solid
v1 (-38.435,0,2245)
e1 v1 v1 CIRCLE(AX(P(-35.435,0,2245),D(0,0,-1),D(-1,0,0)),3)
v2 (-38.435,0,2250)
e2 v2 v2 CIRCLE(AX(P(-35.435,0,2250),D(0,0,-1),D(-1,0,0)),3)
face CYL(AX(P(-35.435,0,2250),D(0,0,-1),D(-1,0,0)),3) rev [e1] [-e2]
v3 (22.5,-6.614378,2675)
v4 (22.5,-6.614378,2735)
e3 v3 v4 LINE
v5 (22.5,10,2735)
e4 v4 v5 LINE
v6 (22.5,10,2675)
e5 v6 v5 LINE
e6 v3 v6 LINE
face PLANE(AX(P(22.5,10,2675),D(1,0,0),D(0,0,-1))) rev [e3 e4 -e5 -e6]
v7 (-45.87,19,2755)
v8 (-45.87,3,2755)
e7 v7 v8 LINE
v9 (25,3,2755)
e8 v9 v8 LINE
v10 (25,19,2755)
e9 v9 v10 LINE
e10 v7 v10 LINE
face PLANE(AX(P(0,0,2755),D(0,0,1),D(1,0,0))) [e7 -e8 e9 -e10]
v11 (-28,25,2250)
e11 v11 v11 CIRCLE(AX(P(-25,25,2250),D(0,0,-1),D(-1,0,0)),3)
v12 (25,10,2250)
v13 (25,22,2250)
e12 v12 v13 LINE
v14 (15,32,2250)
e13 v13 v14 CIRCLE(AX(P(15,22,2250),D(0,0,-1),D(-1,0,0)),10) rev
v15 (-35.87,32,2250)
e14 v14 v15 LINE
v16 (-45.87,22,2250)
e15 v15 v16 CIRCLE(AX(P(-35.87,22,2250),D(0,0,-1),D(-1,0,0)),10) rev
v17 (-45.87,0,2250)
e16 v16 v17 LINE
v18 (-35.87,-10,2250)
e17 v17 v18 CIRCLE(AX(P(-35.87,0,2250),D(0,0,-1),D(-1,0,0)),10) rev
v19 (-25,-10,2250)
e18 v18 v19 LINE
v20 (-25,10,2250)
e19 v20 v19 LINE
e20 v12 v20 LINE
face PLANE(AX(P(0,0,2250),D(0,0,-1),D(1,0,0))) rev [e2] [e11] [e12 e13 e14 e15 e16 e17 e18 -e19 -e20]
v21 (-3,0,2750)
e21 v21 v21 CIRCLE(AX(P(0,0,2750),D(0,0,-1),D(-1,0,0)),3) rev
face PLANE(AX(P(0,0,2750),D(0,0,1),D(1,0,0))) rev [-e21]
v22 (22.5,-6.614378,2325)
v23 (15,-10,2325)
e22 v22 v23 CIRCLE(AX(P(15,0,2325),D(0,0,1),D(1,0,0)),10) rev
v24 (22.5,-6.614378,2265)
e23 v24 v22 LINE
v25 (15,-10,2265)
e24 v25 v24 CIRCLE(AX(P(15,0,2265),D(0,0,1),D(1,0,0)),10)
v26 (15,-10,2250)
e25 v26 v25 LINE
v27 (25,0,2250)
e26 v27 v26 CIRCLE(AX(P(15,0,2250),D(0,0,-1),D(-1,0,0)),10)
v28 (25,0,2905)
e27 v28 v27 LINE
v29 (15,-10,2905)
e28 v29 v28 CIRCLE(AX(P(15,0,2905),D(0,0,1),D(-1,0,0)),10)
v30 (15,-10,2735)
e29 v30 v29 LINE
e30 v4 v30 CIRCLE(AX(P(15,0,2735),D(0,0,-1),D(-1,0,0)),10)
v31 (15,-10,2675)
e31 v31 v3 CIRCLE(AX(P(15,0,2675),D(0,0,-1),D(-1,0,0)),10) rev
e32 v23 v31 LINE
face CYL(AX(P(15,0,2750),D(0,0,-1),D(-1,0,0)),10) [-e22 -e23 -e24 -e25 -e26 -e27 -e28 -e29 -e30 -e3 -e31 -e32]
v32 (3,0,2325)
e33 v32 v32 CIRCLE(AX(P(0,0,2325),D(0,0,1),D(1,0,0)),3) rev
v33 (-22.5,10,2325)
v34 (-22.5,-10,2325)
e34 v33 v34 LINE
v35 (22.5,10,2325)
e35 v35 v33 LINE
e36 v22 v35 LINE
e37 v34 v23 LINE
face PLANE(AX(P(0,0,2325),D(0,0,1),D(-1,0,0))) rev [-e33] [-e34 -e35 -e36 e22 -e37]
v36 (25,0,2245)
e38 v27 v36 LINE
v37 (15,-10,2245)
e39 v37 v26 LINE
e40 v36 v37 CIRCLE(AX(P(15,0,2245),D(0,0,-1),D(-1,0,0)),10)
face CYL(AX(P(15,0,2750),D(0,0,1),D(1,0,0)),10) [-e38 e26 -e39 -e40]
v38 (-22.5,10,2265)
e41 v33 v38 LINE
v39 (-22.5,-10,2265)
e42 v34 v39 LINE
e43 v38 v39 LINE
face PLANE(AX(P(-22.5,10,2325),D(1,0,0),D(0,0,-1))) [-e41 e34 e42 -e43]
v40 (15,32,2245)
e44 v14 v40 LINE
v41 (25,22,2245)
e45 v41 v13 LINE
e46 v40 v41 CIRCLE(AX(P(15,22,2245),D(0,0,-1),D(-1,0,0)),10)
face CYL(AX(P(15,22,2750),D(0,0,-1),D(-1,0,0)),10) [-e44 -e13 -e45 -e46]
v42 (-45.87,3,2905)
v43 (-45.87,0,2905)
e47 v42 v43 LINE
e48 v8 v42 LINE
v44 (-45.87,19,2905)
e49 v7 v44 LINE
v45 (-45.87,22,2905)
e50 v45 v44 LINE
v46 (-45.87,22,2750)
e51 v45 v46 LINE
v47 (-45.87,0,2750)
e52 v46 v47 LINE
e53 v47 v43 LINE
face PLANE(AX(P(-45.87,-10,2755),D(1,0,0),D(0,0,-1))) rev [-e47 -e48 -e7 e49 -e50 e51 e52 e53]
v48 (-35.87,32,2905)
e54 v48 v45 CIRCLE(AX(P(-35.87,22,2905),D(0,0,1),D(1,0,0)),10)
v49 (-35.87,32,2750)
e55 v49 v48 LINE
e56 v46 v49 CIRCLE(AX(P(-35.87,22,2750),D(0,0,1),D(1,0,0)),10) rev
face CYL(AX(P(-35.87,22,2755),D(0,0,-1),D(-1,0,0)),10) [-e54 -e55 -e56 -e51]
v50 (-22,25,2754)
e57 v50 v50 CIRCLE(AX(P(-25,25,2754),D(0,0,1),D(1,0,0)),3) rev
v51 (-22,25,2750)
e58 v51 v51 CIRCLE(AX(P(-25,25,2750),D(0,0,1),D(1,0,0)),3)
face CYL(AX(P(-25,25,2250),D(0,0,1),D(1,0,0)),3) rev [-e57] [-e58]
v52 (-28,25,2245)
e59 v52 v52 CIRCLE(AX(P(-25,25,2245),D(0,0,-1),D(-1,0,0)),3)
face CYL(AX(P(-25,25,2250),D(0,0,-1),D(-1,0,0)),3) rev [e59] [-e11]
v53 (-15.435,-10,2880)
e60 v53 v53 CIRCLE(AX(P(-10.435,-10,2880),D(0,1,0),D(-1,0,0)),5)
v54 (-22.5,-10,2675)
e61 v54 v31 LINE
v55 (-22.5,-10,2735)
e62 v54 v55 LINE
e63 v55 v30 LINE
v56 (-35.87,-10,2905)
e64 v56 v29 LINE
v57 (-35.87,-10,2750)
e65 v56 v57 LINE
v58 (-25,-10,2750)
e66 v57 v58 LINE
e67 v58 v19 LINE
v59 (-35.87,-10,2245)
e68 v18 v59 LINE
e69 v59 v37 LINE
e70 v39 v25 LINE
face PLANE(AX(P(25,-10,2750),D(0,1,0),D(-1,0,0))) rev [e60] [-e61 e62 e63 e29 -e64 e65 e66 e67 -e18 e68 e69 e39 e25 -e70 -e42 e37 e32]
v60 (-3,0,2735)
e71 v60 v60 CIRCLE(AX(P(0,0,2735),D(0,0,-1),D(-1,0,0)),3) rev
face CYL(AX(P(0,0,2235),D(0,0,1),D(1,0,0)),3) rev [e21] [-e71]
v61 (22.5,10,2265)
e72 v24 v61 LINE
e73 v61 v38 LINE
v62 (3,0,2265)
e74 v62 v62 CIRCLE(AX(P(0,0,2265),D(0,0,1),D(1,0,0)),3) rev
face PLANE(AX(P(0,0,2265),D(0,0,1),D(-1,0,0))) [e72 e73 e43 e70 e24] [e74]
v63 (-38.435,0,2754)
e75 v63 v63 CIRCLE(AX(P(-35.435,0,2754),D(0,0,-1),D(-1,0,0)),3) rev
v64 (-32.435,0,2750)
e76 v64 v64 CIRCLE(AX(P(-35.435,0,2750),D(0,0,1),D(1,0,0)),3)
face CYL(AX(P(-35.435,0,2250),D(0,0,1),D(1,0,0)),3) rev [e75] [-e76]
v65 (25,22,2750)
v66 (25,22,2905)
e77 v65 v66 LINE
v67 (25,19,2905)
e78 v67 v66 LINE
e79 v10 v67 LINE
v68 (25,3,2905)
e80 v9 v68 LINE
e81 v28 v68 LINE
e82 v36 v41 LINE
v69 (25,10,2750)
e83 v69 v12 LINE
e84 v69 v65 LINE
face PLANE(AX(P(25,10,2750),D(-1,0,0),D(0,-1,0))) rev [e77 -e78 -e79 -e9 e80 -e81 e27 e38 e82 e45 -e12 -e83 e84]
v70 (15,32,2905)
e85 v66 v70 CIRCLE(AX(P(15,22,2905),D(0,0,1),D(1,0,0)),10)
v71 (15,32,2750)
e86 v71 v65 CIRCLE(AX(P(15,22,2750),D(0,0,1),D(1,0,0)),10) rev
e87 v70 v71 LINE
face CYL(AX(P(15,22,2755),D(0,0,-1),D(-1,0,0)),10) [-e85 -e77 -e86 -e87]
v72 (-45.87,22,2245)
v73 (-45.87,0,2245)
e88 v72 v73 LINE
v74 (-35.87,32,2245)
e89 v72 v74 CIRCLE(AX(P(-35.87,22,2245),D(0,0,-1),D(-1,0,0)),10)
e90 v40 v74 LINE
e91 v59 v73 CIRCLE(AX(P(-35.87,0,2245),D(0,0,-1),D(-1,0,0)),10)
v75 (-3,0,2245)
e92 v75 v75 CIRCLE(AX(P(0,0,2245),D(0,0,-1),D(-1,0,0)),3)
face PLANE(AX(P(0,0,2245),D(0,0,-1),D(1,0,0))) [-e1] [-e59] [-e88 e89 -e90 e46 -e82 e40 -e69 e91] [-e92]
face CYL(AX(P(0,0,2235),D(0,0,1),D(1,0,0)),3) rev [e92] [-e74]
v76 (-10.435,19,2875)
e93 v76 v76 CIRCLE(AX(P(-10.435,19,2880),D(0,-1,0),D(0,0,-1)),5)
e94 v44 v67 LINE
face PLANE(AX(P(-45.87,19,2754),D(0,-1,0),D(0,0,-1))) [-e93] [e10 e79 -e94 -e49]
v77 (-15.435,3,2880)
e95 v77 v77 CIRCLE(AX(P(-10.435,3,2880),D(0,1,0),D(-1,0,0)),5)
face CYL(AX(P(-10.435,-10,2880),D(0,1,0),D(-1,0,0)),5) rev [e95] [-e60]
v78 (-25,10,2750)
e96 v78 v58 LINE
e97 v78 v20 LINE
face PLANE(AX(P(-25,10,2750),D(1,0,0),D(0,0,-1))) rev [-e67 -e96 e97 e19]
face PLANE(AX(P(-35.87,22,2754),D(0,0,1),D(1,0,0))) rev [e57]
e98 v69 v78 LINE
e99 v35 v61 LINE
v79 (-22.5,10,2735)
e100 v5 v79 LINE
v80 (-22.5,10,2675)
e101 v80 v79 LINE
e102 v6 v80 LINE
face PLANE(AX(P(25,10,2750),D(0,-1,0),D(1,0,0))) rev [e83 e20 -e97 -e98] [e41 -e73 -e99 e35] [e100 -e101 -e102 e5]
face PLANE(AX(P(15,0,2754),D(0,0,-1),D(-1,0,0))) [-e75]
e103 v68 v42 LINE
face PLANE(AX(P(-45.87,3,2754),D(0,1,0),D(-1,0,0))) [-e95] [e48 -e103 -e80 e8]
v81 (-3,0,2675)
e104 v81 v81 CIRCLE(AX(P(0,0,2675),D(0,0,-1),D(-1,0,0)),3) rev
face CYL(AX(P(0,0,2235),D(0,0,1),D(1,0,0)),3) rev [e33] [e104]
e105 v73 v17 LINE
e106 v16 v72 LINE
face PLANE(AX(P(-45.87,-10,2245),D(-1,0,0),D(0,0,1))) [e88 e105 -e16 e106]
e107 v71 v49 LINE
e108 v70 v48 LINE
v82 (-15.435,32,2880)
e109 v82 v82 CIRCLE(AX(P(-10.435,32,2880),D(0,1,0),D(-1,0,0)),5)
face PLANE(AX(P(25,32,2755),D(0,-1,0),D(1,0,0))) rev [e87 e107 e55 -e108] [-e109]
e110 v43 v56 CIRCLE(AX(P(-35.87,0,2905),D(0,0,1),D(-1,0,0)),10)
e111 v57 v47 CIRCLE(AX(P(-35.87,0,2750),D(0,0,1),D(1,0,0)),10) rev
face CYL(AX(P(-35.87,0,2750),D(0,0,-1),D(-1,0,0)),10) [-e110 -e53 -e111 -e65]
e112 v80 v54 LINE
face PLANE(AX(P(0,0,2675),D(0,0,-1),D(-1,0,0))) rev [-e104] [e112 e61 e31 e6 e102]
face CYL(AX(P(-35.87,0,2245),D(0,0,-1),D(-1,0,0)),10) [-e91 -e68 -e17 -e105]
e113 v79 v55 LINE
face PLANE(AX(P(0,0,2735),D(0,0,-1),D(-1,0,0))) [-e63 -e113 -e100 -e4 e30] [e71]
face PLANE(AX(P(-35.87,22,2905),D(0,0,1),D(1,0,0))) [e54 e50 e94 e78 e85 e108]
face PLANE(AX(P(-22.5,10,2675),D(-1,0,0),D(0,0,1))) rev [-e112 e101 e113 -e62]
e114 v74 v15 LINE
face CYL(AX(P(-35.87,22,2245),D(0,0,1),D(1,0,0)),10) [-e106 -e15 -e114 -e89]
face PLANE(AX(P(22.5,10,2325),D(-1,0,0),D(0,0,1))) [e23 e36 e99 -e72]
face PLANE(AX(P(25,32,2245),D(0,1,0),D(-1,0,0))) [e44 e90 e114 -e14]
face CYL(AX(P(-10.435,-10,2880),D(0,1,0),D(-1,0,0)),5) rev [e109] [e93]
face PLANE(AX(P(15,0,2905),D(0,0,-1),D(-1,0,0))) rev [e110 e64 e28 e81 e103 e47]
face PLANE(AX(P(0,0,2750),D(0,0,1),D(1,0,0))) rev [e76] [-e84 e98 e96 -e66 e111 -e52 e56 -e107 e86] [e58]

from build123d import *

# Parameters (mm, degrees)
SKETCH1_W                = 500
SKETCH1_H                = 200
BOSS_EXTRUDE1_DEPTH      = 5000
SKETCH2_W                = 450
SKETCH2_H                = 200
CUT_EXTRUDE1_DEPTH       = 600
CUT_EXTRUDE3_DEPTH       = 5000
CUT_EXTRUDE3_DEPTH_BACK  = 300
SKETCH5_R                = 30
SCALE2_SCALE             = 0.1
SKETCH13_W               = 70.87
SKETCH13_H               = 42
BOSS_EXTRUDE7_DEPTH      = 5
CUT_EXTRUDE8_DEPTH       = 509.087646868
CUT_EXTRUDE8_DEPTH_BACK  = 509.087646868
SKETCH14_R               = 3
FILLET9_R                = 10
BOSS_EXTRUDE8_DEPTH      = 150
BOSS_EXTRUDE8_DEPTH_BACK = 1
CUT_EXTRUDE9_DEPTH       = 2906.665682232
CUT_EXTRUDE9_DEPTH_BACK  = 2906.665682232
SKETCH16_R               = 5
CUT_EXTRUDE10_START      = -5
SKETCH17_R               = 3
CUT_EXTRUDE10_DEPTH      = 5
FILLET10_R               = 10
SKETCH18_R               = 3
CUT_EXTRUDE11_DEPTH      = 10


with BuildPart() as part:
    # Sketch1 → Boss-Extrude1 (new body)
    with BuildSketch(Plane.XY):
        Rectangle(SKETCH1_W, SKETCH1_H)
    extrude(amount=BOSS_EXTRUDE1_DEPTH)

    # Sketch2 → Cut-Extrude1 (cut)
    with BuildSketch(Plane.XY.offset(4850)):
        Rectangle(SKETCH2_W, SKETCH2_H)
    cut_extrude1 = extrude(amount=-CUT_EXTRUDE1_DEPTH, mode=Mode.SUBTRACT)

    # Mirror1: Cut-Extrude1 across plane
    add(cut_extrude1.mirror(Plane.XY.offset(2500)), mode=Mode.SUBTRACT)

    # Sketch5 → Cut-Extrude3 (cut, two sides: drawn at the far end of the back side and taken through both)
    with BuildSketch(Plane(origin=(0, 0, 4850), x_dir=(-1, 0, 0), z_dir=(0, 0, -1)).offset(-CUT_EXTRUDE3_DEPTH_BACK)):
        with Locations(Location((0, 0, 0), (0, 0, 180))):
            Circle(SKETCH5_R)
    extrude(amount=CUT_EXTRUDE3_DEPTH + CUT_EXTRUDE3_DEPTH_BACK, mode=Mode.SUBTRACT)


with BuildPart() as part_1:
    # Scale2: scaled about (0, 0, 2500)
    add(part.part.scale(SCALE2_SCALE).moved(Location((0, 0, 2250))))

    # Sketch13 → Boss-Extrude7 (add)
    with BuildSketch(Plane.XY.offset(2750)):
        with Locations((-10.435, 11)):
            Rectangle(SKETCH13_W, SKETCH13_H)
    boss_extrude7 = extrude(amount=BOSS_EXTRUDE7_DEPTH)

    # Sketch14 → Cut-Extrude8 (cut, two sides: drawn at the far end of the back side and taken through both)
    with BuildSketch(Plane.XY.offset(2755).offset(-CUT_EXTRUDE8_DEPTH_BACK)):
        with Locations((-35.435, 0)):
            Circle(SKETCH14_R)
        with Locations((-25, 25)):
            Circle(SKETCH14_R)
    extrude(amount=CUT_EXTRUDE8_DEPTH + CUT_EXTRUDE8_DEPTH_BACK, mode=Mode.SUBTRACT)

    # Fillet9
    # the kernel refuses this fillet: 10 mm, written as the material it takes off along each edge
    with BuildSketch(Plane(origin=(-45.87, 32, 2725), x_dir=(1, 0, 0), z_dir=(0, 0, 1)), Plane(origin=(25, 32, 2725), x_dir=(0, -1, 0), z_dir=(0, 0, 1))) as fillet9_piece_1:
        with BuildLine():
            CenterArc((FILLET9_R, -FILLET9_R), FILLET9_R, 90, 90)
            Line((0, -FILLET9_R), (0, 0))
            Line((0, 0), (FILLET9_R, 0))
        make_face()
    extrude(amount=55, mode=Mode.SUBTRACT)
    with BuildSketch(Plane(origin=(-45.87, -10, 2725), x_dir=(1, 0, 0), z_dir=(0, 0, 1))) as fillet9_piece_2:
        with BuildLine():
            CenterArc((FILLET9_R, FILLET9_R), FILLET9_R, 180, 90)
            Line((0, FILLET9_R), (0, 0))
            Line((0, 0), (FILLET9_R, 0))
        make_face()
    extrude(amount=55, mode=Mode.SUBTRACT)
    with BuildSketch(Plane(origin=(25, -10, 2780), x_dir=(0, 1, 0), z_dir=(0, 0, -1))) as fillet9_piece_3:
        with BuildLine():
            CenterArc((FILLET9_R, -FILLET9_R), FILLET9_R, 90, 90)
            Line((0, -FILLET9_R), (0, 0))
            Line((0, 0), (FILLET9_R, 0))
        make_face()
    extrude(amount=555, mode=Mode.SUBTRACT)

    # Sketch15 → Boss-Extrude8 (add, two sides: drawn at the far end of the back side and taken through both)
    with BuildSketch(Plane.XY.offset(2755).offset(-BOSS_EXTRUDE8_DEPTH_BACK)):
        with BuildLine():
            Line((-45.87, 19), (25, 19))
            Line((25, 19), (25, 22))
            ThreePointArc((25, 22), (22.071067812, 29.071067812), (15, 32))
            Line((15, 32), (-35.87, 32))
            ThreePointArc((-35.87, 32), (-42.941067812, 29.071067812), (-45.87, 22))
            Line((-45.87, 22), (-45.87, 19))
        make_face()
        with BuildLine():
            Line((25, 3), (25, 0))
            ThreePointArc((25, 0), (22.071067812, -7.071067812), (15, -10))
            Line((15, -10), (-35.87, -10))
            ThreePointArc((-35.87, -10), (-42.941067812, -7.071067812), (-45.87, 0))
            Line((-45.87, 0), (-45.87, 3))
            Line((-45.87, 3), (25, 3))
        make_face()
    extrude(amount=BOSS_EXTRUDE8_DEPTH + BOSS_EXTRUDE8_DEPTH_BACK)

    # Sketch16 → Cut-Extrude9 (cut, two sides: drawn at the far end of the back side and taken through both)
    with BuildSketch(Plane(origin=(0, 32, 0), x_dir=(1, 0, 0), z_dir=(0, 1, 0)).offset(-CUT_EXTRUDE9_DEPTH_BACK)):
        with Locations(Location((-10.435, -2880, 0), (0, 0, 180))):
            Circle(SKETCH16_R)
    extrude(amount=CUT_EXTRUDE9_DEPTH + CUT_EXTRUDE9_DEPTH_BACK, mode=Mode.SUBTRACT)

    # Mirror9: Boss-Extrude7 across plane
    add(boss_extrude7.mirror(Plane.XY.offset(2500)))

    # Sketch17 → Cut-Extrude10 (cut)
    with BuildSketch(Plane(origin=(0, 0, 2245), x_dir=(-1, 0, 0), z_dir=(0, 0, -1)).offset(CUT_EXTRUDE10_START)):
        with Locations(Location((25, 25, 0), (0, 0, 180))):
            Circle(SKETCH17_R)
        with Locations(Location((35.435, 0, 0), (0, 0, 180))):
            Circle(SKETCH17_R)
    extrude(amount=CUT_EXTRUDE10_DEPTH, mode=Mode.SUBTRACT)

    # Fillet10
    fillet10_edges = [part_1.edges().sort_by_distance(p)[0] for p in [
        (25, 32, 2247.5),
        (25, -10, 2247.5),
        (-45.87, -10, 2247.5),
        (-45.87, 32, 2247.5),
    ]]
    fillet(fillet10_edges, radius=FILLET10_R)

    # Sketch18 → Cut-Extrude11 (cut)
    with BuildSketch(Plane.XY.offset(2250)):
        Circle(SKETCH18_R)
    extrude(amount=-CUT_EXTRUDE11_DEPTH, mode=Mode.SUBTRACT)


solid = part_1.part
